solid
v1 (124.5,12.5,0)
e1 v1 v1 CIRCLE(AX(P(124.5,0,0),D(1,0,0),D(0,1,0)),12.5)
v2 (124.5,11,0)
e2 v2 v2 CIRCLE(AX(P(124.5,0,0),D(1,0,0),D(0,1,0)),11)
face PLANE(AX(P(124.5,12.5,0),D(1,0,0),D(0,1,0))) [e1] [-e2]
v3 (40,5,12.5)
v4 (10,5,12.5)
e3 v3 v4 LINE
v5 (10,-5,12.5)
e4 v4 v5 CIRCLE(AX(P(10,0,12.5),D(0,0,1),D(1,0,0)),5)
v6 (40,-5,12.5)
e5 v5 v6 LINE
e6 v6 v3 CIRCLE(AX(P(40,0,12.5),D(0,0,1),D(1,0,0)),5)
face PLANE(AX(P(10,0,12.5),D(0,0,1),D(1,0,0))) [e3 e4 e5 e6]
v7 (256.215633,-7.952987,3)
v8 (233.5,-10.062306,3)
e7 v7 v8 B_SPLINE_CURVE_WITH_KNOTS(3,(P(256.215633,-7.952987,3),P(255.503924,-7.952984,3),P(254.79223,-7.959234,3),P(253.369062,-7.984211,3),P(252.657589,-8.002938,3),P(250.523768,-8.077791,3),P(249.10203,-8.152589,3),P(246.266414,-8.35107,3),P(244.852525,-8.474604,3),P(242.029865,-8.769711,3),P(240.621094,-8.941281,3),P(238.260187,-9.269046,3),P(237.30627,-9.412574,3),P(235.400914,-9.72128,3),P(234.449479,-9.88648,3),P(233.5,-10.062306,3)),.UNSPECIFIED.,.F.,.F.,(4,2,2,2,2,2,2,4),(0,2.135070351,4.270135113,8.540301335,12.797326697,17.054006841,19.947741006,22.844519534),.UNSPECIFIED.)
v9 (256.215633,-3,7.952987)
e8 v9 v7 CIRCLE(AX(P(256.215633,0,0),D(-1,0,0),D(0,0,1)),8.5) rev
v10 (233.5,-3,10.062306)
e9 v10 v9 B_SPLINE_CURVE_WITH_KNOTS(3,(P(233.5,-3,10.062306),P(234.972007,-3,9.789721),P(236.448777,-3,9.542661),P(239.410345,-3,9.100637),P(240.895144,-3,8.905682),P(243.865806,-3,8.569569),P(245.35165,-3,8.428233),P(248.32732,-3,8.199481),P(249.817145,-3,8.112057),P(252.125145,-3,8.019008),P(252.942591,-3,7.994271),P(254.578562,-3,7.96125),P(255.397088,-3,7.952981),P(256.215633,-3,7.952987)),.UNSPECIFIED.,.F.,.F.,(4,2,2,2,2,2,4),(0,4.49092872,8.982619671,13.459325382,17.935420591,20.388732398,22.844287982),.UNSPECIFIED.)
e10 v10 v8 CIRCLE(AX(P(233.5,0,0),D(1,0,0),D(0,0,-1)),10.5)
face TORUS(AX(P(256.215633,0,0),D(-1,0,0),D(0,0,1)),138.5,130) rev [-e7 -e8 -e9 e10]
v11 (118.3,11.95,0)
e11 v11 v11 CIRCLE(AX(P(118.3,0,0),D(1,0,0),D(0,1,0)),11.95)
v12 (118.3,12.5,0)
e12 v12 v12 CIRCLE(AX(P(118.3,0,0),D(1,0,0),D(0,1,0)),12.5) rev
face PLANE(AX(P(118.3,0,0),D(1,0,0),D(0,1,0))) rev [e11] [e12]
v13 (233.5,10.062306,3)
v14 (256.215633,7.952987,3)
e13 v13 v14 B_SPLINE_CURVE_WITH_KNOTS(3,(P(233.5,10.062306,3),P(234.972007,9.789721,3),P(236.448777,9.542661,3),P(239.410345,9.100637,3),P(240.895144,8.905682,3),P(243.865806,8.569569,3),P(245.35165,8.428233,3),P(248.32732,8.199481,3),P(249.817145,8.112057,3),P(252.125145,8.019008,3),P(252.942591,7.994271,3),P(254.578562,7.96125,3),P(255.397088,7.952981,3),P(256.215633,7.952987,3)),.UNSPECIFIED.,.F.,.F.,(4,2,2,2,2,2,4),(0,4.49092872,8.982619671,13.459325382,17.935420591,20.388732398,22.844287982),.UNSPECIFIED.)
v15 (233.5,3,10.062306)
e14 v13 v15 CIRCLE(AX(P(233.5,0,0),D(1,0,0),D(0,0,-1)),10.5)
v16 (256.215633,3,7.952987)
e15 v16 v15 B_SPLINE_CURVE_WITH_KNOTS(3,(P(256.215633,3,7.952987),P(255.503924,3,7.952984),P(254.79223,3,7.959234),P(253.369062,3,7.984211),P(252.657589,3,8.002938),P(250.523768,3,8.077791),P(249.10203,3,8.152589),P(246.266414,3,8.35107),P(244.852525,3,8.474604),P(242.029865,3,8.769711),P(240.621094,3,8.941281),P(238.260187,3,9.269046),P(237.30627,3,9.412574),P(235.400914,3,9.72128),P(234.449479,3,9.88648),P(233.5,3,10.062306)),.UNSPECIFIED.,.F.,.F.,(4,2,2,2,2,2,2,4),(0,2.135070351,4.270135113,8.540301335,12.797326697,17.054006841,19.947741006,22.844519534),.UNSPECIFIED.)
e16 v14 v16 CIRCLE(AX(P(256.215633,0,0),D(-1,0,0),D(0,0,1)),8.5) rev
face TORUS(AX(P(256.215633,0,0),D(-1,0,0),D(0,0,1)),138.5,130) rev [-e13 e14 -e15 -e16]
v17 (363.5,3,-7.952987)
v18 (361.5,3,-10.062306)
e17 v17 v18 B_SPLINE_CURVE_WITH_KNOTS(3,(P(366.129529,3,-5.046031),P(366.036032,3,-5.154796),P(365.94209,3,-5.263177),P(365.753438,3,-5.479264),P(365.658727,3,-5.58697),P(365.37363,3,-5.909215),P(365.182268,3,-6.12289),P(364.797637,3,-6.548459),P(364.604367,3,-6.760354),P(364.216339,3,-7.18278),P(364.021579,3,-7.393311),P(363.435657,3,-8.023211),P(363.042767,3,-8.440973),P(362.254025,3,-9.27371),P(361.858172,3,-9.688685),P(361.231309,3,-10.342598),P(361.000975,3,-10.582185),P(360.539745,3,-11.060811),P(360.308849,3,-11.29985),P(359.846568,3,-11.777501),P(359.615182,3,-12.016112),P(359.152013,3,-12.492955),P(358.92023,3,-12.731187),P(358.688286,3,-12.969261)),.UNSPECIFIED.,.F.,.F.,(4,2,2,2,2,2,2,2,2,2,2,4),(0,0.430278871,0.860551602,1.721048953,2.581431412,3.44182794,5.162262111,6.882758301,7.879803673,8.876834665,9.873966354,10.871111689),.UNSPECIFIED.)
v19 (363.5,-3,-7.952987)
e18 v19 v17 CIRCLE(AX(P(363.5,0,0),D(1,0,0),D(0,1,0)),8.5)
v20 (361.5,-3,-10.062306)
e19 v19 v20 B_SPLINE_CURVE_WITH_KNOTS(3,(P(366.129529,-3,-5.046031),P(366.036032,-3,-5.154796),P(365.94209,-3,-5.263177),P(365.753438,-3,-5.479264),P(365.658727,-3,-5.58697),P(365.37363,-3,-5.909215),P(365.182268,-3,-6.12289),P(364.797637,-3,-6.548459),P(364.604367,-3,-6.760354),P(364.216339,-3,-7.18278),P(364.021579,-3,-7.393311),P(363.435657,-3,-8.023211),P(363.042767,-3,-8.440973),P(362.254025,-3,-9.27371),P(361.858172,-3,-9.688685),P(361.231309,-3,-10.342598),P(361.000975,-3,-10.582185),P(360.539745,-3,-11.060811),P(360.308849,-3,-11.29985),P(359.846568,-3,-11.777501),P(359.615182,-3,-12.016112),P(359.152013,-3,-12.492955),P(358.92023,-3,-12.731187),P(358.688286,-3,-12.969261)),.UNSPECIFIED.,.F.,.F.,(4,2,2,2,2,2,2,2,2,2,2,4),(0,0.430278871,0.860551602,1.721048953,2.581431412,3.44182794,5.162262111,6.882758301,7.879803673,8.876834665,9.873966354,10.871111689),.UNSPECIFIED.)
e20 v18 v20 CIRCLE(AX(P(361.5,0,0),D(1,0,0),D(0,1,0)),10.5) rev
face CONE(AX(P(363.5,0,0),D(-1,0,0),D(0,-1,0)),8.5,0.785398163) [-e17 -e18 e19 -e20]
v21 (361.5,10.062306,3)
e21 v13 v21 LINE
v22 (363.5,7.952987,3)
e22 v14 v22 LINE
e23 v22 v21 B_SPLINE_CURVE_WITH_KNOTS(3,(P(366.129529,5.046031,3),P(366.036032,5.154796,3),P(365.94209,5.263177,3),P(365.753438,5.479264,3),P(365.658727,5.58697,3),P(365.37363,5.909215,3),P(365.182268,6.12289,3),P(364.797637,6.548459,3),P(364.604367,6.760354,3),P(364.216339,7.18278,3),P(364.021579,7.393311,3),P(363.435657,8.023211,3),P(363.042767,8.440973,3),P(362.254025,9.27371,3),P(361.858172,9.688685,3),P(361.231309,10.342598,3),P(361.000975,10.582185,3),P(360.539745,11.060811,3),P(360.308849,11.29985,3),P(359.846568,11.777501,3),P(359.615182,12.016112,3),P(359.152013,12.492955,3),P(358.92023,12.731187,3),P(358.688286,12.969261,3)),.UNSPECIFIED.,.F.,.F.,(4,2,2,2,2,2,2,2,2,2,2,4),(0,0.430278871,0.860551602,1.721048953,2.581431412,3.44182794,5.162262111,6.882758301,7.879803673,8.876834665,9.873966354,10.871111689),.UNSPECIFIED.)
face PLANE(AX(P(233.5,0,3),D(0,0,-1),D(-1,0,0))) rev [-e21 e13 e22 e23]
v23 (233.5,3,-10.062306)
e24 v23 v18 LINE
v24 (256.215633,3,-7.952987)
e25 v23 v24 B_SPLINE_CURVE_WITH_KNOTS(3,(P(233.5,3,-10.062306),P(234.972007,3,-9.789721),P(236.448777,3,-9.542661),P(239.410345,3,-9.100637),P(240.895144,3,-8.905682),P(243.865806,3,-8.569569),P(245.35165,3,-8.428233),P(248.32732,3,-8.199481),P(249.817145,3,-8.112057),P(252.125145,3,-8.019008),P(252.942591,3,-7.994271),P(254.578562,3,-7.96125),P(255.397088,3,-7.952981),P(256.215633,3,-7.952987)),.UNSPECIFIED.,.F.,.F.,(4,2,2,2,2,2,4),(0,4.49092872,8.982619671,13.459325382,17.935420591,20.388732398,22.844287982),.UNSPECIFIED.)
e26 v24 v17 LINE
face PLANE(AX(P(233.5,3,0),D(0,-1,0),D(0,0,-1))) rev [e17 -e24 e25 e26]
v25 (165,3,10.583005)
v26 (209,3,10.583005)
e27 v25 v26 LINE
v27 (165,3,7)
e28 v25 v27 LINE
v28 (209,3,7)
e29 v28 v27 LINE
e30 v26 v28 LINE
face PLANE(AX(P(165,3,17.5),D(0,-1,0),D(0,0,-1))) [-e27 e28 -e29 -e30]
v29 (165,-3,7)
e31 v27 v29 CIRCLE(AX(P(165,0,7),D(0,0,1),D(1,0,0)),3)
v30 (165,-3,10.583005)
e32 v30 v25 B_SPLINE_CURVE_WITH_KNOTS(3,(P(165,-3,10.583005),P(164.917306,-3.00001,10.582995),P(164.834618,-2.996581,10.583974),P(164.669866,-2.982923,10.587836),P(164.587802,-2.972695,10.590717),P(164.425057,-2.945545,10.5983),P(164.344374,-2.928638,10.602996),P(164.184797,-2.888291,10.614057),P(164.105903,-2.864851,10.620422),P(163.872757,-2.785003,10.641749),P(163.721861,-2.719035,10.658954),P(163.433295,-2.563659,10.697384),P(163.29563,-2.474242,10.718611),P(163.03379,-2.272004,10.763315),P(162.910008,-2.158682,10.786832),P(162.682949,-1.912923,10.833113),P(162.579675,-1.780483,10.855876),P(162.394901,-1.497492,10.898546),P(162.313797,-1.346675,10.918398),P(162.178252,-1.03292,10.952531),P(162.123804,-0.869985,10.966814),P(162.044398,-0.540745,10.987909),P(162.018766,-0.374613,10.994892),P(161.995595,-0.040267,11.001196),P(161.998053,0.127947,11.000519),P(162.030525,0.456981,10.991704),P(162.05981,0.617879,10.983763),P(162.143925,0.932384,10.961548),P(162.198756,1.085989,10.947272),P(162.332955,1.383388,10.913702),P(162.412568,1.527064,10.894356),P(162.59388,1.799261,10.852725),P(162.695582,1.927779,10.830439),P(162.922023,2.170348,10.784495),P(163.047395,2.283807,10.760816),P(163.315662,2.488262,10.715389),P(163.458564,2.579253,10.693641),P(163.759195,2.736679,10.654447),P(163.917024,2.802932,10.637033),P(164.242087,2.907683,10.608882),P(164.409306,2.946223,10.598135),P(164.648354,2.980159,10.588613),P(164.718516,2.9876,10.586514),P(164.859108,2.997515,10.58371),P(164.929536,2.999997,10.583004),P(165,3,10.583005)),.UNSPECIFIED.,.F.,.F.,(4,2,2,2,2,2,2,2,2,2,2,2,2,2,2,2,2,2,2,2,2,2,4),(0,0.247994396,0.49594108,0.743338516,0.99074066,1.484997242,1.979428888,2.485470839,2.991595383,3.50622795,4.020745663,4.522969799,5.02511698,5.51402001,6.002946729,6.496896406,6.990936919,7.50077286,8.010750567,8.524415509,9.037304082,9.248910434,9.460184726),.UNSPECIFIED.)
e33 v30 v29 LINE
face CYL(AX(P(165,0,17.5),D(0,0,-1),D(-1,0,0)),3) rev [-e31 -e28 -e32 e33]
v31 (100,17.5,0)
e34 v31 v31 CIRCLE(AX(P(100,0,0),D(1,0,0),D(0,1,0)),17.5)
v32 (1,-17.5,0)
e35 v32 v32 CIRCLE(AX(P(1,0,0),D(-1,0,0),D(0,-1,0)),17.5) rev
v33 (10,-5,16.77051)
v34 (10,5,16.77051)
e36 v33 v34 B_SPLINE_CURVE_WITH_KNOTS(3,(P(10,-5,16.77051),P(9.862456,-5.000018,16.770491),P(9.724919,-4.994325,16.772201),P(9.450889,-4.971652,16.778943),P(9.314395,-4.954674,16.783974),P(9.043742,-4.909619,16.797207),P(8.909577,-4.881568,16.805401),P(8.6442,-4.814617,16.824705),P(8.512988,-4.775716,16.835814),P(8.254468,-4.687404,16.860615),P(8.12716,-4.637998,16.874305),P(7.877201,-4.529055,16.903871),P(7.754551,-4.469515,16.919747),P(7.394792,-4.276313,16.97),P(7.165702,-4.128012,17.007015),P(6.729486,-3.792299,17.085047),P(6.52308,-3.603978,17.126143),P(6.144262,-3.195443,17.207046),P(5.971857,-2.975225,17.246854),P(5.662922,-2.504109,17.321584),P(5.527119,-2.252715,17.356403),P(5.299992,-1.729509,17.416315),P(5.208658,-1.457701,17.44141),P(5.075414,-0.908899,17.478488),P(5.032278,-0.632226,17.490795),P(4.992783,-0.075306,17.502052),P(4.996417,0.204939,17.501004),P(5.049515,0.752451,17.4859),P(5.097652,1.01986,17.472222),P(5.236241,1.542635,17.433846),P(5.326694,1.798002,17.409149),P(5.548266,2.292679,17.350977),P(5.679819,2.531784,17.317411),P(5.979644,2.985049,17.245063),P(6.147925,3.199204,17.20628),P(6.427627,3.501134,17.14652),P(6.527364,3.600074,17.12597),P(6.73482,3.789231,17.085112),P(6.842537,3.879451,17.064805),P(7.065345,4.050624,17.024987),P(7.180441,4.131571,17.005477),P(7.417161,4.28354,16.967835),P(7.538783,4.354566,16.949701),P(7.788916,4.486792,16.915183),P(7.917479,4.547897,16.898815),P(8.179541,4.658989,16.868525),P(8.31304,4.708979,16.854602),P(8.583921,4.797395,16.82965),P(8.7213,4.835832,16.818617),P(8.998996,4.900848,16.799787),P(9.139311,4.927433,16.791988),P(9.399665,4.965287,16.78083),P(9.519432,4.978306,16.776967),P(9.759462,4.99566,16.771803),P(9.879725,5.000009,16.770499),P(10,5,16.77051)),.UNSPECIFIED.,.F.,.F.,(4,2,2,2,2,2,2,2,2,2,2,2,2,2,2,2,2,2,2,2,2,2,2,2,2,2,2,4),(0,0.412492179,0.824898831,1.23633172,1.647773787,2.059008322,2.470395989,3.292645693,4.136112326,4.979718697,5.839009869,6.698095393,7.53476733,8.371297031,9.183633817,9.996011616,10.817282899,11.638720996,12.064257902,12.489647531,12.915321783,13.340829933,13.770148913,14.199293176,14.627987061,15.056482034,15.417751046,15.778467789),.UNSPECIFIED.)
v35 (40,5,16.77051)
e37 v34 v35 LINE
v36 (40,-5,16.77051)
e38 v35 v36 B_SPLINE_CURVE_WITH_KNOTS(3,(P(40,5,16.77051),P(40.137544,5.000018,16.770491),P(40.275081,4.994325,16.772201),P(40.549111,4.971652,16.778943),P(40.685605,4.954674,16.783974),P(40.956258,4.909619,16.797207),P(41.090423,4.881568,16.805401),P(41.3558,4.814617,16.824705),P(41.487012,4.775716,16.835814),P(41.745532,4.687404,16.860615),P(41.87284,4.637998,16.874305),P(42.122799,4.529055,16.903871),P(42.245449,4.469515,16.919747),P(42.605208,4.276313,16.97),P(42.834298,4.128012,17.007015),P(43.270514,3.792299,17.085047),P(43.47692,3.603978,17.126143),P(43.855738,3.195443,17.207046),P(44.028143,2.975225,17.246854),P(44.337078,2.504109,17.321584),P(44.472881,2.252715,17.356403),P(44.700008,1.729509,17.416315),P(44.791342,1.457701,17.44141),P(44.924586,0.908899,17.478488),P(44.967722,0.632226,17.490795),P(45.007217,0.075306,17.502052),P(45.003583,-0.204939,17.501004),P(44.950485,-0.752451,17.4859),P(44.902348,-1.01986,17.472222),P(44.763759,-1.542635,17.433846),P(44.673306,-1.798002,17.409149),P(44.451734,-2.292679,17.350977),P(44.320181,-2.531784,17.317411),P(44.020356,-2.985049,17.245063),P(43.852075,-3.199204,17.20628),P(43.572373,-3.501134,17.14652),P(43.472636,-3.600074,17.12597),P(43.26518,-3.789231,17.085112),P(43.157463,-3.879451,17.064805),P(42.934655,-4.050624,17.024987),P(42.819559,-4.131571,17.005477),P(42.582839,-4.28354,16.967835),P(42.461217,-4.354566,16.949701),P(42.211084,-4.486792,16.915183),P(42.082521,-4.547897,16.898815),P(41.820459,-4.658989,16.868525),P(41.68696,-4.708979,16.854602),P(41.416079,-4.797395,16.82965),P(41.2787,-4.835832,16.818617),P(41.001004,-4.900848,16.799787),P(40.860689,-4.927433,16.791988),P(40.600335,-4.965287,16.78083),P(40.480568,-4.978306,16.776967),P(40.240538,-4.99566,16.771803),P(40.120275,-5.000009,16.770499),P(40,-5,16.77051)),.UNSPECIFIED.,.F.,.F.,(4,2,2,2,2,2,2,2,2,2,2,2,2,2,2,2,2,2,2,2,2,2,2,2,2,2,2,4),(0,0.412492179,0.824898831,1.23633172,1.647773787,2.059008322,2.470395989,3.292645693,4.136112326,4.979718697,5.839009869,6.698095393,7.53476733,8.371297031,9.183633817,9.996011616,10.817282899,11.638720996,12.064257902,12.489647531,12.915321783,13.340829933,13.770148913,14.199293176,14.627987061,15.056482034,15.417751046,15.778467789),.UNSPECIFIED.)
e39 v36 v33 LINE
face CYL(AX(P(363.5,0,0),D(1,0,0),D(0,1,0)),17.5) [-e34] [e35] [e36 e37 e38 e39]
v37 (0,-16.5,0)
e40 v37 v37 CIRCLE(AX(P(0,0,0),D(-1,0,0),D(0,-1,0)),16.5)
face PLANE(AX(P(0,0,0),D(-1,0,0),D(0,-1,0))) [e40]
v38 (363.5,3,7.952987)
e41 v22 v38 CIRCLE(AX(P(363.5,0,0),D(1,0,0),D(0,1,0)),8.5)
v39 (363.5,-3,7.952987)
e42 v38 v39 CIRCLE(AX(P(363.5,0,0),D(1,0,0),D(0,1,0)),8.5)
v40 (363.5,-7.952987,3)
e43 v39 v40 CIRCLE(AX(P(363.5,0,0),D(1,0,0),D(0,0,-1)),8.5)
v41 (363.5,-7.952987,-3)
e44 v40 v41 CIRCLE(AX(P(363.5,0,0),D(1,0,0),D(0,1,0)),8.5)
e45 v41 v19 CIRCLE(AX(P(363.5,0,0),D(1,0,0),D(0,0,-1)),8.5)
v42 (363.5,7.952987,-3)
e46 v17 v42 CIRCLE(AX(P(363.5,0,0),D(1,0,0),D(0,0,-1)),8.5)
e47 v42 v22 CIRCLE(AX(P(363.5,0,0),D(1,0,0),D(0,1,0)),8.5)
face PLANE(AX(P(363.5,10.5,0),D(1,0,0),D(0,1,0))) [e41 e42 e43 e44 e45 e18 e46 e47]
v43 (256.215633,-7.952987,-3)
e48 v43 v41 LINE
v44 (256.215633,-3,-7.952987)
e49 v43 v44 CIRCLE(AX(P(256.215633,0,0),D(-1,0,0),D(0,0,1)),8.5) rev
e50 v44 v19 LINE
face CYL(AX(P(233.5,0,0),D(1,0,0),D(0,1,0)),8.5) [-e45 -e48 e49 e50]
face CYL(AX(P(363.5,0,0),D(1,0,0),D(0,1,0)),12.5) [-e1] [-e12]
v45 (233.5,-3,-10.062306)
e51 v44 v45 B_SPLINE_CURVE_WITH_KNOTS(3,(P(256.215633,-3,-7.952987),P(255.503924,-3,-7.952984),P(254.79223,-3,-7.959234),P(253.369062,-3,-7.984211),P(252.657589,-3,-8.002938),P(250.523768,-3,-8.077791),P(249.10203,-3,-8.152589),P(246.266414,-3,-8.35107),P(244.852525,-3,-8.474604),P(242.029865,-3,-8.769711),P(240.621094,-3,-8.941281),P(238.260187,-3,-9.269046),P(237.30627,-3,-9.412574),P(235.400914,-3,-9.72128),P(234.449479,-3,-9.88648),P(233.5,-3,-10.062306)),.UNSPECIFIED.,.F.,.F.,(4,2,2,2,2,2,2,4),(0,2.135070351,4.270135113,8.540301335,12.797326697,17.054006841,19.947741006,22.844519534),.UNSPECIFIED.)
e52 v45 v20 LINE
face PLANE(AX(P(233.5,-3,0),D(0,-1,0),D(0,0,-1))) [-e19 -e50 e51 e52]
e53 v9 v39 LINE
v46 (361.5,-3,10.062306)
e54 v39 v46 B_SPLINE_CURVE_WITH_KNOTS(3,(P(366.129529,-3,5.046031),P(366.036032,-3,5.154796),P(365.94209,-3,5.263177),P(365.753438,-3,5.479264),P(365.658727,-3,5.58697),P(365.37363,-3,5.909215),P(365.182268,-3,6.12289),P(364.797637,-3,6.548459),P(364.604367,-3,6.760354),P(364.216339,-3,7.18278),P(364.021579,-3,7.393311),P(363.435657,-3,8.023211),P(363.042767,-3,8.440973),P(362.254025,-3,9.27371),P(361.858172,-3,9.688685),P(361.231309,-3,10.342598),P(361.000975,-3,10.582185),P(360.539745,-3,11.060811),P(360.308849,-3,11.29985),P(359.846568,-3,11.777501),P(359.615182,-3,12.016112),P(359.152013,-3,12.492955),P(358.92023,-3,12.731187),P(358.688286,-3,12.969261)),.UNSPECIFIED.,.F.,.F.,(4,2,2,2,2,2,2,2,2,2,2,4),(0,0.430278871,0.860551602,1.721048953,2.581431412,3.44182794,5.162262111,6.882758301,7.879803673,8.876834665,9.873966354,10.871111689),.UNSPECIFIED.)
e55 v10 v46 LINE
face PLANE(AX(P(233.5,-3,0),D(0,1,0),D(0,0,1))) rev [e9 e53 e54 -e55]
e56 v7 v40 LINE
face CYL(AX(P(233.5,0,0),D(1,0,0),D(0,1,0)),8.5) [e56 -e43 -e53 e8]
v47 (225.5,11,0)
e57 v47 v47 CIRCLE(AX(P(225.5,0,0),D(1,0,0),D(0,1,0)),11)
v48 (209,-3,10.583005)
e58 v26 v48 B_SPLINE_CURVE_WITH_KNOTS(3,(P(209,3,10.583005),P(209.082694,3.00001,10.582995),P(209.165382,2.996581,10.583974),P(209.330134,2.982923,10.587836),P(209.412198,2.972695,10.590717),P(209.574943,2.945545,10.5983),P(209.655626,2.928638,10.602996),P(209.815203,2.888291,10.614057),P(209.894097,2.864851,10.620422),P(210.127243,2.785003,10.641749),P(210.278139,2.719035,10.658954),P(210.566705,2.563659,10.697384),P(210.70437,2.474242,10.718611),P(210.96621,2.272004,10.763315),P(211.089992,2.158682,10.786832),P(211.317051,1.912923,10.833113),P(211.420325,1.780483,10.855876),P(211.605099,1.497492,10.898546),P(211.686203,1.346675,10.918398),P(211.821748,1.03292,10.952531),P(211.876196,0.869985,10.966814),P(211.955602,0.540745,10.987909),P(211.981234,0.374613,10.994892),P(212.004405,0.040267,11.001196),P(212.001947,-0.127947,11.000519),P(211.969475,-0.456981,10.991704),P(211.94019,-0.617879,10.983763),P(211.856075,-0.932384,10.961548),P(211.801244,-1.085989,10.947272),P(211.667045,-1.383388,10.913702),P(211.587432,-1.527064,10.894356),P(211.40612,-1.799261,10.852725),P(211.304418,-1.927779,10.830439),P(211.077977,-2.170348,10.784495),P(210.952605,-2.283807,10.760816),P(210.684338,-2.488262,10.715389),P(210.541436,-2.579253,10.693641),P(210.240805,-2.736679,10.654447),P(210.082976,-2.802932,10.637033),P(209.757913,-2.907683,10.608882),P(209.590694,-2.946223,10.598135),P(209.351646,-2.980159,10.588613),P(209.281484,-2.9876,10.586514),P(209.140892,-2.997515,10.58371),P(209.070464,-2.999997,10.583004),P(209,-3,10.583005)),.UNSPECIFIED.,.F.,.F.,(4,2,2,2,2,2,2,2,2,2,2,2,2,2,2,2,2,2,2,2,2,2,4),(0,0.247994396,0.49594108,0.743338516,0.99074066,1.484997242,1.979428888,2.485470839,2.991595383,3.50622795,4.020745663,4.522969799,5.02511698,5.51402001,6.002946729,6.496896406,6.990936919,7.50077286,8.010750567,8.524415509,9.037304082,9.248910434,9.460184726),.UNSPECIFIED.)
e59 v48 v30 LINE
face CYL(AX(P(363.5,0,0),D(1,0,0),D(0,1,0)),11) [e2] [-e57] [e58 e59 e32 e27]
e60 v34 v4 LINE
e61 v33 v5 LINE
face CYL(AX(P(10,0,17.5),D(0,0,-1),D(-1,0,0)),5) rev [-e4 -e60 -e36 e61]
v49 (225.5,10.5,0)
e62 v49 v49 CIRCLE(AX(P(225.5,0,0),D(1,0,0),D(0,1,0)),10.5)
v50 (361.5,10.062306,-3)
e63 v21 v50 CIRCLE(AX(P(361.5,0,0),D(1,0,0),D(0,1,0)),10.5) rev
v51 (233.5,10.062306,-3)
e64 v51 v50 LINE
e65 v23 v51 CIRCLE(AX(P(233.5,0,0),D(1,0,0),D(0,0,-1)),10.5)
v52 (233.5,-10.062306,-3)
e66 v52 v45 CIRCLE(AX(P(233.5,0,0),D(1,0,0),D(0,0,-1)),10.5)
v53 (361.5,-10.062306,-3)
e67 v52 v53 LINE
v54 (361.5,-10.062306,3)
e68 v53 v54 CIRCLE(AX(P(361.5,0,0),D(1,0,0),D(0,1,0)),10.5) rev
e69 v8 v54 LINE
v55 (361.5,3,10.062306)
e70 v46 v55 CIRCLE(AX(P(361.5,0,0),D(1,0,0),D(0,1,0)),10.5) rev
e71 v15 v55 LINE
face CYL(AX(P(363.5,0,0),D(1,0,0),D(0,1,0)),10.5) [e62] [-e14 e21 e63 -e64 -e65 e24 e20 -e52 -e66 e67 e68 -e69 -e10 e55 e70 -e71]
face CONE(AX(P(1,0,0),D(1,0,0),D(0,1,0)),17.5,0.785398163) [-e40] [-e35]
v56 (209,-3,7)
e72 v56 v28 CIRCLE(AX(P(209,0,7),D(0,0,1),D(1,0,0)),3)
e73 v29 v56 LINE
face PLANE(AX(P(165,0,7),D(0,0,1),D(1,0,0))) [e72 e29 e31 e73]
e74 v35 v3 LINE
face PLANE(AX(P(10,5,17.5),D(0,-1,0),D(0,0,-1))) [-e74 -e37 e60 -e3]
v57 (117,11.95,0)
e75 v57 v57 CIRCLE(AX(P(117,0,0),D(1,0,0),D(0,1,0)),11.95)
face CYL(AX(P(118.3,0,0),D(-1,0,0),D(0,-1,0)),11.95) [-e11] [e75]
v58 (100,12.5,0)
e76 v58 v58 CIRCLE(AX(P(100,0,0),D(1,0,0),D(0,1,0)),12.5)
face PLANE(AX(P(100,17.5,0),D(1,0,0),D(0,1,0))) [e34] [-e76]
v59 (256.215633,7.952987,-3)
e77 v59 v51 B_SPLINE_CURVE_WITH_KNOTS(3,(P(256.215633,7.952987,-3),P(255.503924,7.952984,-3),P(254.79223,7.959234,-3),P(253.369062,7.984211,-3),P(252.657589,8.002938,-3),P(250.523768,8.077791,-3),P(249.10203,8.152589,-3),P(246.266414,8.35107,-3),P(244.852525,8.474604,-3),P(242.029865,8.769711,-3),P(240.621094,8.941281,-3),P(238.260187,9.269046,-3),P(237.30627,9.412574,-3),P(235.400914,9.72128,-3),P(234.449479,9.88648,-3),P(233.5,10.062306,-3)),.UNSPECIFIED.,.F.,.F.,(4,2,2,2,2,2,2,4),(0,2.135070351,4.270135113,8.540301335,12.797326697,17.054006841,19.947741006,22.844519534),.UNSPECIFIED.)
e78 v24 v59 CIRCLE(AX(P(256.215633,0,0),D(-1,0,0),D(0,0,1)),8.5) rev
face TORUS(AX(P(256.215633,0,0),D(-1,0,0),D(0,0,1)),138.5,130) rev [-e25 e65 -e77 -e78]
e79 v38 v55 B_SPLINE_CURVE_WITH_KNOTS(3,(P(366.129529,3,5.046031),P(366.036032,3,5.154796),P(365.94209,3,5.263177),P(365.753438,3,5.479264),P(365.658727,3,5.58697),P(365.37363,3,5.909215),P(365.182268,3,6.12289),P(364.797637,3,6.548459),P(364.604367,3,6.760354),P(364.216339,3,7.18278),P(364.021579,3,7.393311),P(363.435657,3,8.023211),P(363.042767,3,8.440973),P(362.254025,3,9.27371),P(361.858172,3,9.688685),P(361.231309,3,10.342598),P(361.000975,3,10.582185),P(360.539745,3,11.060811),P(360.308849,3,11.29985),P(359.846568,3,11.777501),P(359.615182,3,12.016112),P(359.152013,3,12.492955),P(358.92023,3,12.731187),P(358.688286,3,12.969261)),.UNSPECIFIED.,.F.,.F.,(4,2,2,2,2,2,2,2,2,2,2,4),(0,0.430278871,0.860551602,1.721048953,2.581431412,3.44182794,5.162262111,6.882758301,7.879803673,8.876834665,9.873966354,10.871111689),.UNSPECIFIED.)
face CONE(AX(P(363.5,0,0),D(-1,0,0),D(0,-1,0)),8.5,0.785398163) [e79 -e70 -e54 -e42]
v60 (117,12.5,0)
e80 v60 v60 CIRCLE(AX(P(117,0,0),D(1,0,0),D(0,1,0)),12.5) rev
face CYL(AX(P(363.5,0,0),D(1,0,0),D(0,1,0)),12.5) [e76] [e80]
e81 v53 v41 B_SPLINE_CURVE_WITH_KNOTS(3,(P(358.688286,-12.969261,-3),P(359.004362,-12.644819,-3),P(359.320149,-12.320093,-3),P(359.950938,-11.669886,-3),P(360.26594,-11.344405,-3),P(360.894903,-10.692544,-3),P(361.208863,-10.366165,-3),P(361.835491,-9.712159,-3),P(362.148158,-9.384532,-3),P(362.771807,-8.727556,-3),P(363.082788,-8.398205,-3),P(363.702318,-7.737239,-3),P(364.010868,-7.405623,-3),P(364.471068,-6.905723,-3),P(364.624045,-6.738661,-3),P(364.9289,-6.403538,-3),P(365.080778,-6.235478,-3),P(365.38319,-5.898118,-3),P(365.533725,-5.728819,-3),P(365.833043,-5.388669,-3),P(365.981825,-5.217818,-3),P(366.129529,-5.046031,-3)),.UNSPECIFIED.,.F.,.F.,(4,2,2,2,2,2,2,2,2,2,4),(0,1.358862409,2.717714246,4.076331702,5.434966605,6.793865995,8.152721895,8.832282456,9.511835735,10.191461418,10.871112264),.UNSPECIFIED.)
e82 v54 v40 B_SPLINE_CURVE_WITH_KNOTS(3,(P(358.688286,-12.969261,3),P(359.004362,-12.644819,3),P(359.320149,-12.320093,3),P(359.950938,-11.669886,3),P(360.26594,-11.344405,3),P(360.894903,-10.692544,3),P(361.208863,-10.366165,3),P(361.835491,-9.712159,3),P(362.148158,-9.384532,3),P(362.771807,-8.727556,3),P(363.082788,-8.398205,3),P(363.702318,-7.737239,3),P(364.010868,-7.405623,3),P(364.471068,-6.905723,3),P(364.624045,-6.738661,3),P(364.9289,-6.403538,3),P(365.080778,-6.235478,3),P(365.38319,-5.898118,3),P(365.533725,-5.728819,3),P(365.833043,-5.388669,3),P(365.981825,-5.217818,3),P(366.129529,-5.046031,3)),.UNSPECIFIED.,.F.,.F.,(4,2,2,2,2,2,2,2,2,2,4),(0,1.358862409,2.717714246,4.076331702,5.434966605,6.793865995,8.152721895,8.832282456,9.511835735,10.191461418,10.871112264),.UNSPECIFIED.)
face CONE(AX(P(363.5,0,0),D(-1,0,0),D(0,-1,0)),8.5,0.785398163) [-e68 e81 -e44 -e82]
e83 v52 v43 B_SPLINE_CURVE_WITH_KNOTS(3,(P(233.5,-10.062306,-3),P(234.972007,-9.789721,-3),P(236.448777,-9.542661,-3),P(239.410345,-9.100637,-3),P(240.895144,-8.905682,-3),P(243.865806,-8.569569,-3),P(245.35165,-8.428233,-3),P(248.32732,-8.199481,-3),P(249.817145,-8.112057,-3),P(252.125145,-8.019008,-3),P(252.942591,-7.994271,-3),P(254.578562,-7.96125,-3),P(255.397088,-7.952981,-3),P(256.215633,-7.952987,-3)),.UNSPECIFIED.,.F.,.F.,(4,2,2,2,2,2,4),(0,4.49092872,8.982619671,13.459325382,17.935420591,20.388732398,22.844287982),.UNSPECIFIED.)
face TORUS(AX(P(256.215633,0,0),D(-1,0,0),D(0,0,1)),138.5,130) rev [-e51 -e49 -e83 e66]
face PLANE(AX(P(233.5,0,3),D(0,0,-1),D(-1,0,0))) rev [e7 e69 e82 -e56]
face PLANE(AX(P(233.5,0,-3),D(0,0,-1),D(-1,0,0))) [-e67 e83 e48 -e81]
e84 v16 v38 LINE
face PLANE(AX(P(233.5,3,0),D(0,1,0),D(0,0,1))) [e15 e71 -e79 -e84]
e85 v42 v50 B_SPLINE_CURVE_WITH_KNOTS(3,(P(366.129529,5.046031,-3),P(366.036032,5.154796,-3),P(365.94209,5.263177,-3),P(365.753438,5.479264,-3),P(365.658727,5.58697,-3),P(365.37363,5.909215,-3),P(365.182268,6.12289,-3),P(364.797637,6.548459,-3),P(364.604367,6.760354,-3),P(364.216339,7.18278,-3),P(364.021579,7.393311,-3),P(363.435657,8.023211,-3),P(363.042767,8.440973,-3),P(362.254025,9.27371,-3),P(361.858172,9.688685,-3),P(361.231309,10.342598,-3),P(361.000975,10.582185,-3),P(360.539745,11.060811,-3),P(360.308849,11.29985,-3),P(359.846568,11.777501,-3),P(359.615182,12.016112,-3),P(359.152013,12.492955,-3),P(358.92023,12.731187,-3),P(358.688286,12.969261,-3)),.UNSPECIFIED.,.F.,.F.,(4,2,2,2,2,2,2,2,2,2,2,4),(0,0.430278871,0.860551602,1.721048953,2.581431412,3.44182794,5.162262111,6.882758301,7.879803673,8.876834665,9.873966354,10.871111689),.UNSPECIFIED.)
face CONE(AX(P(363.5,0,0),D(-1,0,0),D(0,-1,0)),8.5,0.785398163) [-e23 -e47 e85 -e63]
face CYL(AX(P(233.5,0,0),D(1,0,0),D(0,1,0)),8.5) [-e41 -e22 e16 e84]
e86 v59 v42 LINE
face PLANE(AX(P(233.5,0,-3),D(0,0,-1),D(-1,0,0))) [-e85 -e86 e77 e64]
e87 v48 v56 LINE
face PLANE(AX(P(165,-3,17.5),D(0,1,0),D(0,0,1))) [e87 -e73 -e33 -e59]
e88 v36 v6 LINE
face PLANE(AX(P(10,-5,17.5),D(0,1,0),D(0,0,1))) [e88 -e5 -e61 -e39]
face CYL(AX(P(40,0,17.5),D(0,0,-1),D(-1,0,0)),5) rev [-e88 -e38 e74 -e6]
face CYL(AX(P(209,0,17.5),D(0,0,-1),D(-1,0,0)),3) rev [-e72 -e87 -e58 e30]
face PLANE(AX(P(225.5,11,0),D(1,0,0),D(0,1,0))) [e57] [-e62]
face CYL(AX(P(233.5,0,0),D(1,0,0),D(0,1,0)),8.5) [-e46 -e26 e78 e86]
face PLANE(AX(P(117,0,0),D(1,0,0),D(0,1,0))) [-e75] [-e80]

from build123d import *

# Parameters (mm, degrees)
CHAMFER_1_SIZE      = 1
CHAMFER_2_SIZE      = 2
CUT_EXTRUDE_START   = 17
SKETCH_2_OUTSIDE_W  = 110.37
SKETCH_2_OUTSIDE_H  = 110.37
SKETCH_2_OUTSIDE_R  = 11.95
CUT_EXTRUDE_1_DEPTH = 1.3
CUT_EXTRUDE_2_DEPTH = 130
FILLET_1_R          = 130
CUT_EXTRUDE_START_2 = 7
CUT_EXTRUDE_3_DEPTH = 358.341529437
CUT_EXTRUDE_START_3 = 12.5
CUT_EXTRUDE_4_DEPTH = 352.841529437


with BuildPart() as part:
    # 草图1 → 旋转1 (revolve)
    with BuildSketch(Plane.XY):
        Polygon((0, 0), (0, 17.5), (100, 17.5), (100, 12.5), (124.5, 12.5), (124.5, 11), (225.5, 11), (225.5, 10.5), (363.5, 10.5), (363.5, 0), align=None)
    revolve(axis=Axis((363.5, 0, 0), (-1, 0, 0)))

    # 倒角1
    chamfer_1_edges = [part.edges().sort_by_distance(p)[0] for p in [
        (0, -17.5, 0),
    ]]
    chamfer(chamfer_1_edges, length=CHAMFER_1_SIZE)

    # 倒角2
    chamfer_2_edges = [part.edges().sort_by_distance(p)[0] for p in [
        (363.5, -10.5, 0),
    ]]
    chamfer(chamfer_2_edges, length=CHAMFER_2_SIZE)

    # 草图2 outside → 切除-拉伸1 (cut)
    with BuildSketch(Plane(origin=(100, 0, 0), x_dir=(0, 0, -1), z_dir=(1, 0, 0)).offset(CUT_EXTRUDE_START)):
        Rectangle(SKETCH_2_OUTSIDE_W, SKETCH_2_OUTSIDE_H)
        with Locations(Location((0, 0, 0), (0, 0, 90))):
            Circle(SKETCH_2_OUTSIDE_R, mode=Mode.SUBTRACT)
    extrude(amount=CUT_EXTRUDE_1_DEPTH, mode=Mode.SUBTRACT)

    # 草图3 → 切除-拉伸2 (cut)
    with BuildSketch(Plane(origin=(363.5, 0, 0), x_dir=(0, 0, -1), z_dir=(1, 0, 0))):
        with BuildLine():
            Line((-10.062305899, 3), (-7.95298686, 3))
            ThreePointArc((-7.95298686, 3), (-6.01040764, 6.01040764), (-3, 7.95298686))
            Line((-3, 7.95298686), (-3, 10.062305899))
            ThreePointArc((-3, 10.062305899), (-7.424621202, 7.424621202), (-10.062305899, 3))
        make_face()
        with BuildLine():
            Line((3, 10.062305899), (3, 7.95298686))
            ThreePointArc((3, 7.95298686), (6.01040764, 6.01040764), (7.95298686, 3))
            Line((7.95298686, 3), (10.062305899, 3))
            ThreePointArc((10.062305899, 3), (7.424621202, 7.424621202), (3, 10.062305899))
        make_face()
        with BuildLine():
            ThreePointArc((7.95298686, -3), (6.01040764, -6.01040764), (3, -7.95298686))
            Line((3, -7.95298686), (3, -10.062305899))
            ThreePointArc((3, -10.062305899), (7.424621202, -7.424621202), (10.062305899, -3))
            Line((10.062305899, -3), (7.95298686, -3))
        make_face()
        with BuildLine():
            ThreePointArc((-10.062305899, -3), (-7.424621202, -7.424621202), (-3, -10.062305899))
            Line((-3, -10.062305899), (-3, -7.95298686))
            ThreePointArc((-3, -7.95298686), (-6.01040764, -6.01040764), (-7.95298686, -3))
            Line((-7.95298686, -3), (-10.062305899, -3))
        make_face()
    extrude(amount=-CUT_EXTRUDE_2_DEPTH, mode=Mode.SUBTRACT)

    # 圆角1
    # the kernel refuses this fillet: 130 mm, written as the material it adds along each edge
    with BuildSketch(Plane(origin=(233.5, 0, 0), x_dir=(0, 0.7048818539423689, -0.7093247295722663), z_dir=(0, 0.7093247295722663, 0.7048818539423689))) as fillet_1_piece_1:
        with BuildLine():
            CenterArc((138.5, -22.715633383), FILLET_1_R, 169.936725557, 10.063274443)
            Line((10.5, 0), (8.5, 0))
            Line((8.5, 0), (8.5, -22.715633383))
        make_face()
    revolve(axis=Axis((233.5, 0, 0), (-1, 0, 0)), revolution_arc=359.64)
    with BuildSketch(Plane(origin=(233.5, 0, 0), x_dir=(0, 0.7093247295722621, 0.7048818539423733), z_dir=(0, -0.7048818539423733, 0.7093247295722621))) as fillet_1_piece_2:
        with BuildLine():
            CenterArc((138.5, -22.715633383), FILLET_1_R, 169.936725557, 10.063274443)
            Line((10.5, 0), (8.5, 0))
            Line((8.5, 0), (8.5, -22.715633383))
        make_face()
    revolve(axis=Axis((233.5, 0, 0), (-1, 0, 0)), revolution_arc=359.64)
    with BuildSketch(Plane(origin=(233.5, 0, 0), x_dir=(0, -0.7048818539423463, 0.7093247295722888), z_dir=(0, -0.7093247295722888, -0.7048818539423463))) as fillet_1_piece_3:
        with BuildLine():
            CenterArc((138.5, -22.715633383), FILLET_1_R, 169.936725557, 10.063274443)
            Line((10.5, 0), (8.5, 0))
            Line((8.5, 0), (8.5, -22.715633383))
        make_face()
    revolve(axis=Axis((233.5, 0, 0), (-1, 0, 0)), revolution_arc=359.64)
    with BuildSketch(Plane(origin=(233.5, 0, 0), x_dir=(0, -0.7093247295722879, -0.7048818539423474), z_dir=(0, 0.7048818539423474, -0.7093247295722879))) as fillet_1_piece_4:
        with BuildLine():
            CenterArc((138.5, -22.715633383), FILLET_1_R, 169.936725557, 10.063274443)
            Line((10.5, 0), (8.5, 0))
            Line((8.5, 0), (8.5, -22.715633383))
        make_face()
    revolve(axis=Axis((233.5, 0, 0), (-1, 0, 0)), revolution_arc=359.64)

    # 草图4 → 切除-拉伸3 (cut, through all)
    with BuildSketch(Plane.XY.offset(CUT_EXTRUDE_START_2)):
        with BuildLine():
            Line((165, 3), (209, 3))
            ThreePointArc((209, 3), (212, 0), (209, -3))
            Line((209, -3), (165, -3))
            ThreePointArc((165, -3), (162, 0), (165, 3))
        make_face()
    extrude(amount=CUT_EXTRUDE_3_DEPTH, mode=Mode.SUBTRACT)

    # 草图5 → 切除-拉伸4 (cut, through all)
    with BuildSketch(Plane.XY.offset(CUT_EXTRUDE_START_3)):
        with BuildLine():
            Line((10, 5), (40, 5))
            ThreePointArc((40, 5), (45, 0), (40, -5))
            Line((40, -5), (10, -5))
            ThreePointArc((10, -5), (5, 0), (10, 5))
        make_face()
    extrude(amount=CUT_EXTRUDE_4_DEPTH, mode=Mode.SUBTRACT)


solid = part.part
